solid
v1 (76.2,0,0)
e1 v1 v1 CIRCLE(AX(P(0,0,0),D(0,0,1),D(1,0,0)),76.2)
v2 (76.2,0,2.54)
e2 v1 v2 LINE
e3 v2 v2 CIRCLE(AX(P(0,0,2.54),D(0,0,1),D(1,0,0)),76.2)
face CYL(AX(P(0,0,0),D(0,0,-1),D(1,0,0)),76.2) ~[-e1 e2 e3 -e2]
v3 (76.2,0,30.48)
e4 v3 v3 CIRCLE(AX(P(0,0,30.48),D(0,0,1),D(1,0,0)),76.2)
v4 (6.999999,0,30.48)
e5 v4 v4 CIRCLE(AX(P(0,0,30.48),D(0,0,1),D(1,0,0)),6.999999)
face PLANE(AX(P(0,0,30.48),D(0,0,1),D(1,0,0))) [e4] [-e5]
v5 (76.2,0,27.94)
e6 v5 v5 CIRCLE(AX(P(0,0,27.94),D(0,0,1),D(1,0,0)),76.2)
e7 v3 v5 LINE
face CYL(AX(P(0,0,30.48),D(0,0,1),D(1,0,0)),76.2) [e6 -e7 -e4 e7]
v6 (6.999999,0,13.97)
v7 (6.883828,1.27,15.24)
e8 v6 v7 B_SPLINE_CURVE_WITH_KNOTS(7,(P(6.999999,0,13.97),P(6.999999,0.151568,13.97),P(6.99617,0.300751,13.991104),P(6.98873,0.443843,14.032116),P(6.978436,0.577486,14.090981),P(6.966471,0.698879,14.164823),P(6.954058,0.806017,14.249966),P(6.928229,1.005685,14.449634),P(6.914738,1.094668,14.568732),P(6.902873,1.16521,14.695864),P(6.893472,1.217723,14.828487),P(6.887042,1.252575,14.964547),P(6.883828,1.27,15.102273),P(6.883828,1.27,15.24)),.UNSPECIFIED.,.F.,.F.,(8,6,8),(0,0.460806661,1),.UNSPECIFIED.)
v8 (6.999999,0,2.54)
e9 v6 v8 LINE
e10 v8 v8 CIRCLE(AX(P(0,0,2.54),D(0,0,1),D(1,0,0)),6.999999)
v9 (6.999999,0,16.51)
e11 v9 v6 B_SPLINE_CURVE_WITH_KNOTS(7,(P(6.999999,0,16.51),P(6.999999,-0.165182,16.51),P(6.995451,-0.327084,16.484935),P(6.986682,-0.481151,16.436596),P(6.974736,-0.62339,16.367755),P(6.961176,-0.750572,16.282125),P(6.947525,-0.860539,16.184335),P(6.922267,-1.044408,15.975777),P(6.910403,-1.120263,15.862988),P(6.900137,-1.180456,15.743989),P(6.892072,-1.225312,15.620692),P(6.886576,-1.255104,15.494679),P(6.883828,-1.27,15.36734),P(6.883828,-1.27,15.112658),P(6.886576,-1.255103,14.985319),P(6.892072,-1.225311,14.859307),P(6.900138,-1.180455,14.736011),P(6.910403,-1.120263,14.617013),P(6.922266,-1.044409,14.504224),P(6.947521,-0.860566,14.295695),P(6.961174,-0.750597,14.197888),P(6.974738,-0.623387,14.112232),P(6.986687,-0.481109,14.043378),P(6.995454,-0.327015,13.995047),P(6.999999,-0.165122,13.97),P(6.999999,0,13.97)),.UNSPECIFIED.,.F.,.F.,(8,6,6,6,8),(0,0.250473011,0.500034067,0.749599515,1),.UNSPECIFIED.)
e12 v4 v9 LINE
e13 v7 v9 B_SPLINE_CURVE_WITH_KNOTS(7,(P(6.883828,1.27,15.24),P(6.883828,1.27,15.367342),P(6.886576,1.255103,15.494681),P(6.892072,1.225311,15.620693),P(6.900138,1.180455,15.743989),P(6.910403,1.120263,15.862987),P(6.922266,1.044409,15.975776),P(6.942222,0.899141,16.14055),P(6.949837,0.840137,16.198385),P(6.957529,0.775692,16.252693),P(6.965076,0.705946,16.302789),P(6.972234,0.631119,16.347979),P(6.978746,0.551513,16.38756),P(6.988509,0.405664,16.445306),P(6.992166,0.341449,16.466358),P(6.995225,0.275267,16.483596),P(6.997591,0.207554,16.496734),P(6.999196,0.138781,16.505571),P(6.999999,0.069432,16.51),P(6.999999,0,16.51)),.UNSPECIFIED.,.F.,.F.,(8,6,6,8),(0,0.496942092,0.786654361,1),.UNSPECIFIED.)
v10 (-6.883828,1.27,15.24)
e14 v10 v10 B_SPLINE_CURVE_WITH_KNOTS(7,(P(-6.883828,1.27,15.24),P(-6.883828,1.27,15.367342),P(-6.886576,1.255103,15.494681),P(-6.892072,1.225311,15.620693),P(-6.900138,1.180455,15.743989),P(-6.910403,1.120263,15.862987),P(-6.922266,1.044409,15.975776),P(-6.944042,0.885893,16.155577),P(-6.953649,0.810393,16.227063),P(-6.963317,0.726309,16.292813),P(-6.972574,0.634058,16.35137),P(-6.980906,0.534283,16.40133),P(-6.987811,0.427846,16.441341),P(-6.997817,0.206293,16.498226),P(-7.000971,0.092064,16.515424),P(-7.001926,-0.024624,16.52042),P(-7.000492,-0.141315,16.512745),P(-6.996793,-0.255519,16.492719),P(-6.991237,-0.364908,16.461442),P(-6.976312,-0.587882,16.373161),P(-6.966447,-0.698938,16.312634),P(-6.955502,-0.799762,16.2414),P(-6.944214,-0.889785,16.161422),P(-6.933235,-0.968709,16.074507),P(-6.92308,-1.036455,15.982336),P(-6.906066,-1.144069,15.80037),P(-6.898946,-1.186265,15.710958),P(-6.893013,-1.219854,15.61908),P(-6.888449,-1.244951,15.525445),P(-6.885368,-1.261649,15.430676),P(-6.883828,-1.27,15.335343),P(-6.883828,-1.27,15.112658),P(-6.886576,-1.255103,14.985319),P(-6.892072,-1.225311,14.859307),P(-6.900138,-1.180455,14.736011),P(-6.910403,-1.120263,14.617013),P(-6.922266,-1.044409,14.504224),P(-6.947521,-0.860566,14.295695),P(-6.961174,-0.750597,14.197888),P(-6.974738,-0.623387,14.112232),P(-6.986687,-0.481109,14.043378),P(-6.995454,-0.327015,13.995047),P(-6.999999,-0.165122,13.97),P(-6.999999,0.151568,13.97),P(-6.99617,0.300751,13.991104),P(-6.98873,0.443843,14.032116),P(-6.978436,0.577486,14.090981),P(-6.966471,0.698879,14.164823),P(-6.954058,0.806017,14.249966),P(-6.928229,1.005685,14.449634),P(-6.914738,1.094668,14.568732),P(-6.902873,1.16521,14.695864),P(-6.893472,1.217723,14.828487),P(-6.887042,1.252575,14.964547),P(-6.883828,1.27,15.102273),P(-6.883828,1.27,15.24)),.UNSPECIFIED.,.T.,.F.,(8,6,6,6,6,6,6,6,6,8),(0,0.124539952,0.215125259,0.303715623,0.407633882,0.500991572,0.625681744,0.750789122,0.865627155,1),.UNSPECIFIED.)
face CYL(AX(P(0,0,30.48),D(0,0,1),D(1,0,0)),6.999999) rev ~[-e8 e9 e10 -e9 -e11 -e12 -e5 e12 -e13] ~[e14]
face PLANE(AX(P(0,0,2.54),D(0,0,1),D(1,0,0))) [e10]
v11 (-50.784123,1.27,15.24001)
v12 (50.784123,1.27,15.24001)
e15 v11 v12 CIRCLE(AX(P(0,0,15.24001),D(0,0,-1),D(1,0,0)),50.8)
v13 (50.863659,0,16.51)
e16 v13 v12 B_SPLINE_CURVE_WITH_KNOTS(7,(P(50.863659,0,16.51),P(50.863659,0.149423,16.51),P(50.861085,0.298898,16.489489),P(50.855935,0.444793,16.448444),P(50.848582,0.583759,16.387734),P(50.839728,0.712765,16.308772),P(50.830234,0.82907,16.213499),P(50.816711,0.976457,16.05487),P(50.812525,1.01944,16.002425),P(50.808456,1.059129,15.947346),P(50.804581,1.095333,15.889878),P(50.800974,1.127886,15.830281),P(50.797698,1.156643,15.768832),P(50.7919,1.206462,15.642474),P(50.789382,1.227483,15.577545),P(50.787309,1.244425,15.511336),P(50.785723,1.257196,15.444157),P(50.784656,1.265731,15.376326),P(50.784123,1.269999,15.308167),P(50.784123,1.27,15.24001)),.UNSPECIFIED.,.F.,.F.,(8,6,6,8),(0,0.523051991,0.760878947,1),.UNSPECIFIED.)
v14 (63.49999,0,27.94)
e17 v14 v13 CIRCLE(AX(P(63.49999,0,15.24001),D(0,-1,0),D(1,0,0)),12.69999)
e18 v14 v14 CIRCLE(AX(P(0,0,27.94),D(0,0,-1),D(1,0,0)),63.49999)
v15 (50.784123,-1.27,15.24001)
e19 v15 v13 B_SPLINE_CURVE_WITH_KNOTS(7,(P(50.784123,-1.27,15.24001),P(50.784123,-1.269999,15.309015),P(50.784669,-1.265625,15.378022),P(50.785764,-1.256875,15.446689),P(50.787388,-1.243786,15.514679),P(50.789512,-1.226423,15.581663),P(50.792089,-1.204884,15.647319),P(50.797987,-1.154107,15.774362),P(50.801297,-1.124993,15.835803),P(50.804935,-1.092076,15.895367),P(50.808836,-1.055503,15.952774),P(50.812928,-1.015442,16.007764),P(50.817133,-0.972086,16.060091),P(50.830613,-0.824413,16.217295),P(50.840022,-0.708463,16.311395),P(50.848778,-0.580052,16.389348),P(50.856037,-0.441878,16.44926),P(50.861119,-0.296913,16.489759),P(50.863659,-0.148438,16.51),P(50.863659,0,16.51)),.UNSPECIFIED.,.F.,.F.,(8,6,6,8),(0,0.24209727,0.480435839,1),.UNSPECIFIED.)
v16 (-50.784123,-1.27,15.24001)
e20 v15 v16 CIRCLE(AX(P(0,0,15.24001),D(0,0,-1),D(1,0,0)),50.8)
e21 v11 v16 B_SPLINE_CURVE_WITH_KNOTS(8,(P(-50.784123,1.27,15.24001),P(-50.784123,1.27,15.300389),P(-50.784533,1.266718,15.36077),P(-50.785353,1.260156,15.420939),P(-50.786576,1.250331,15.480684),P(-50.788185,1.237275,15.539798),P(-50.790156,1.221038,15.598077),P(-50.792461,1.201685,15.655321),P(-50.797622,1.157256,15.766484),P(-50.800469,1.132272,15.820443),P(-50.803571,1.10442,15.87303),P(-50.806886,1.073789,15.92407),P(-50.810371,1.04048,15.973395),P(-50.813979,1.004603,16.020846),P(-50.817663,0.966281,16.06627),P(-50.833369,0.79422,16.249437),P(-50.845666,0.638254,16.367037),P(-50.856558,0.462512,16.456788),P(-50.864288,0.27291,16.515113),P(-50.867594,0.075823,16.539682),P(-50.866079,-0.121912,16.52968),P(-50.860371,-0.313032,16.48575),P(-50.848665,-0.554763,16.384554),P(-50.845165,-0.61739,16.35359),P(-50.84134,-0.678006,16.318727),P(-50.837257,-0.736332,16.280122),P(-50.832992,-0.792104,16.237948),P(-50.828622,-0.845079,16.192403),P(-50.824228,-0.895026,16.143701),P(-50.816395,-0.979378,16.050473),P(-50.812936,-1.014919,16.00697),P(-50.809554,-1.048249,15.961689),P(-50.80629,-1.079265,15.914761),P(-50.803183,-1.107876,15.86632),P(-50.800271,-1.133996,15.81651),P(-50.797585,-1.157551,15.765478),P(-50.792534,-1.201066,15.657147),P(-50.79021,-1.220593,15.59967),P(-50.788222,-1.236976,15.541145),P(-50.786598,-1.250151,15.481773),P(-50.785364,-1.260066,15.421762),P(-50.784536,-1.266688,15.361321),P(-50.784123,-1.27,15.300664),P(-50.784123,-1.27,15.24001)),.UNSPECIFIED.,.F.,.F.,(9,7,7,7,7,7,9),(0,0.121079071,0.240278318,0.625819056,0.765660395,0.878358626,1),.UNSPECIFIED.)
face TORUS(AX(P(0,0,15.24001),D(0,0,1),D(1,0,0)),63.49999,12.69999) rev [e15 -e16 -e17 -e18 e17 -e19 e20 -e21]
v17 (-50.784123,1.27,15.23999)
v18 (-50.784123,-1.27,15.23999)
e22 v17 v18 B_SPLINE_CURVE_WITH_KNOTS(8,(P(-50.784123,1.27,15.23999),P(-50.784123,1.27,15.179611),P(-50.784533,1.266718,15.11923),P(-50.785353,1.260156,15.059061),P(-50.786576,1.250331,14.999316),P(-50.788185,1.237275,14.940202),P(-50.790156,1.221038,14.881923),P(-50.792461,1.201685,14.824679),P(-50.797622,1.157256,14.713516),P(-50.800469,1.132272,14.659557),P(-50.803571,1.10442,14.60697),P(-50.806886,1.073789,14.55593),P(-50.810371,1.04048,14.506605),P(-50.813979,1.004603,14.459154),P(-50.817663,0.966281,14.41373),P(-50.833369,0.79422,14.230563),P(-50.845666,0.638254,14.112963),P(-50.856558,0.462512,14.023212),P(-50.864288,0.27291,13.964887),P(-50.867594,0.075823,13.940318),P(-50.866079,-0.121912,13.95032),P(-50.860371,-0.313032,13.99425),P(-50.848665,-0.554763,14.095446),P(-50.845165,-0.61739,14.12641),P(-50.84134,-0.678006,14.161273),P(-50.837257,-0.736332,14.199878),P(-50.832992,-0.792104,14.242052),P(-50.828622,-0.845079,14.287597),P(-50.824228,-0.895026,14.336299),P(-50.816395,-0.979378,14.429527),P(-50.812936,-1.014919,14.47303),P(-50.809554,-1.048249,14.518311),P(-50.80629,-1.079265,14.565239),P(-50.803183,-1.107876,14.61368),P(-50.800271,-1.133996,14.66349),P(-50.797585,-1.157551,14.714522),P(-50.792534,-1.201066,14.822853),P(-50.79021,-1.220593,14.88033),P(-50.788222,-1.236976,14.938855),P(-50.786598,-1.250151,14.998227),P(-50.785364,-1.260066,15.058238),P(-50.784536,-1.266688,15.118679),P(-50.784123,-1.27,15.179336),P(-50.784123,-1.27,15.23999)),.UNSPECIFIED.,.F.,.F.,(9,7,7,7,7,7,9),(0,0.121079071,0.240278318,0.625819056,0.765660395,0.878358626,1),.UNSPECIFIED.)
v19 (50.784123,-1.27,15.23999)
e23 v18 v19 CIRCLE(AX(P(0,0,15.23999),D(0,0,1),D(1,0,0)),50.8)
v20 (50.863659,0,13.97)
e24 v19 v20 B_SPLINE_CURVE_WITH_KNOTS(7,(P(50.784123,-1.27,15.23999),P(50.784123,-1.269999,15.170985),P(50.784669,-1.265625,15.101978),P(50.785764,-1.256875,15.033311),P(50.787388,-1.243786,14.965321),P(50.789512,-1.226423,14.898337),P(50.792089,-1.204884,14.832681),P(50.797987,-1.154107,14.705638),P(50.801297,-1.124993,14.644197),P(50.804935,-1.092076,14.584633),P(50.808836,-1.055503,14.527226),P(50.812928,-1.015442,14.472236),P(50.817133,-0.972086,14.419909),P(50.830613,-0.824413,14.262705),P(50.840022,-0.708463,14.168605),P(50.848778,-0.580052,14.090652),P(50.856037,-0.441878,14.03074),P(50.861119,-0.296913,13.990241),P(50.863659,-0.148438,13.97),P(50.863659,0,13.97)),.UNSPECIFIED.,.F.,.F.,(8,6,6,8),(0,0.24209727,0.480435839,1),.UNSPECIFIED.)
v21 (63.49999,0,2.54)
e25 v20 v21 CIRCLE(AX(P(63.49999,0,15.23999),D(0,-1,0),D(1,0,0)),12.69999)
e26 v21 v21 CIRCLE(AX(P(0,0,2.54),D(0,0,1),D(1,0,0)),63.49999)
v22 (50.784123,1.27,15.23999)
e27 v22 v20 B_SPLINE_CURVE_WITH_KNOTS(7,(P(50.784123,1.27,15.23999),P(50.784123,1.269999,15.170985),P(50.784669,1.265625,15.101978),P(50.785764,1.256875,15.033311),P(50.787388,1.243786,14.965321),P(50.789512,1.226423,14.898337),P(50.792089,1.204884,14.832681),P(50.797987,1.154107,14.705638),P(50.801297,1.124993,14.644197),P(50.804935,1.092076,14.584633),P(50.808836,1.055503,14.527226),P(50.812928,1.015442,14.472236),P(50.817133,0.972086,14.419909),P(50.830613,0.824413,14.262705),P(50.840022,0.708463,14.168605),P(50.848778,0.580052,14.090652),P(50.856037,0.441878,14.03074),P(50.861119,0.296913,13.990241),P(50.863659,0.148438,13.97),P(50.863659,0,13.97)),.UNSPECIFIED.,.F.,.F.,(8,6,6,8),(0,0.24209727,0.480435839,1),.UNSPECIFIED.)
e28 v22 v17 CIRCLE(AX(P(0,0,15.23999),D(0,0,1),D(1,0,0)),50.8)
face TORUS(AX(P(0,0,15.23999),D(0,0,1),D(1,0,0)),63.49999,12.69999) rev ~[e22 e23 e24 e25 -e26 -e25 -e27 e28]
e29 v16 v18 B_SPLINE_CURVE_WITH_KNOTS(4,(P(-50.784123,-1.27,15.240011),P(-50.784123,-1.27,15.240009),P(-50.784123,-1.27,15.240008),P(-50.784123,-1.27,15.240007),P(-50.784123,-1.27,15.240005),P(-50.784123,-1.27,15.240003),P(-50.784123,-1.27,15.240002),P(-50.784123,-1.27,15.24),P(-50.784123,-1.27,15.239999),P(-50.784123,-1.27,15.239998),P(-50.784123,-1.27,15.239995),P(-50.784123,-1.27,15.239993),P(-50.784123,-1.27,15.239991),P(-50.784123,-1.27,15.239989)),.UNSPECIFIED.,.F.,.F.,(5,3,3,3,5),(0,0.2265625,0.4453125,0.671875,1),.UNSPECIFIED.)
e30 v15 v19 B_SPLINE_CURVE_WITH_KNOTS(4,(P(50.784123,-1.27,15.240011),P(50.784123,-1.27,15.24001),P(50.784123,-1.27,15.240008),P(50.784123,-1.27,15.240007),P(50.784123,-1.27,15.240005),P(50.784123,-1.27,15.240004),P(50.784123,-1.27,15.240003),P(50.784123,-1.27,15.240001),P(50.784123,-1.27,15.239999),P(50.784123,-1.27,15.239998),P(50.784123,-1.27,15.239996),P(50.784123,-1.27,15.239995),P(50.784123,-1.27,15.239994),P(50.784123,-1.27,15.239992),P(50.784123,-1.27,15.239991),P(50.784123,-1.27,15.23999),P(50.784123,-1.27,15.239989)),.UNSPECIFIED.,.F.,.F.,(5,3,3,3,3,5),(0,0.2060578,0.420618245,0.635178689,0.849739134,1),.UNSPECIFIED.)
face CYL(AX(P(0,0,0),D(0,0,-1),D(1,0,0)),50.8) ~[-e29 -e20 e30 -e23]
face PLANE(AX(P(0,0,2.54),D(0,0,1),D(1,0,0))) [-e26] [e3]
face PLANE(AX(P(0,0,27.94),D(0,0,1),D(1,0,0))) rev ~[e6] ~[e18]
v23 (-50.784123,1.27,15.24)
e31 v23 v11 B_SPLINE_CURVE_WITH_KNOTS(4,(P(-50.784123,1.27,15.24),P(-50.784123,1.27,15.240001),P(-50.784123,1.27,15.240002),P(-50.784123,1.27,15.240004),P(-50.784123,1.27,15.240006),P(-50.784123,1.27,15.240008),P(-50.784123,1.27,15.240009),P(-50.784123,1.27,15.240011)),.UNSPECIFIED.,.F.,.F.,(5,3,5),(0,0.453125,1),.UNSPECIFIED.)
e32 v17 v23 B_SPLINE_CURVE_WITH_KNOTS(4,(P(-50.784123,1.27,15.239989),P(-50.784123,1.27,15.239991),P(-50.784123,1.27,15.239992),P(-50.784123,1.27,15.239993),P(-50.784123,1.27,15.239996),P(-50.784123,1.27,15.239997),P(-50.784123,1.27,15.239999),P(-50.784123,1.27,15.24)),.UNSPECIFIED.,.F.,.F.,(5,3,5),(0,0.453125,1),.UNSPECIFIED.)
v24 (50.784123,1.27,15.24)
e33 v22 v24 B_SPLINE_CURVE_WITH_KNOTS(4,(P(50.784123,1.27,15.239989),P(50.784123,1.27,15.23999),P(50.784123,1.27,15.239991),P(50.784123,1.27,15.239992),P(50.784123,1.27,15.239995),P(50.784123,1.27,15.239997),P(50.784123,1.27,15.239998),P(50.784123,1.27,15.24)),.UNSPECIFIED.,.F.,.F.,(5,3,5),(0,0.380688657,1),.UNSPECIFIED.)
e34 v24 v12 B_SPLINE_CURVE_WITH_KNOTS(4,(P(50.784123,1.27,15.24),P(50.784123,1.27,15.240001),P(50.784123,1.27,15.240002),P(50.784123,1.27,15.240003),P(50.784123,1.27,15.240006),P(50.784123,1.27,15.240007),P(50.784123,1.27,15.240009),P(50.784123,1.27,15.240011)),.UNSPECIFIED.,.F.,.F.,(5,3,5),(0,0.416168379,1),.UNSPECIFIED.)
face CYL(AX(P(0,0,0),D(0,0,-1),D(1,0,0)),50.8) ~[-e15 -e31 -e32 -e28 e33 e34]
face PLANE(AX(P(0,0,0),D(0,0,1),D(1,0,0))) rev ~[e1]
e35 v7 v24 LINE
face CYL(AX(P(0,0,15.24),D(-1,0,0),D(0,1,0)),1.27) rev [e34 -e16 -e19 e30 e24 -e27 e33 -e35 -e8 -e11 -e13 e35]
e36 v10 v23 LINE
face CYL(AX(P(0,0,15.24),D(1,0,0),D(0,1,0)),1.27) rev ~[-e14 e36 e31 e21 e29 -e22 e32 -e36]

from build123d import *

# Parameters (mm, degrees)
F0_R      = 50.8
F1_DEPTH  = 30.48
F0_R_2    = 76.2
F2_DEPTH  = 2.54
F3_R      = 76.2
F4_DEPTH  = 2.54
F5_R      = 12.69999
F6_R      = 1.27
F7_DEPTH  = 254
F8_DEPTH  = 254
F9_R      = 6.9999987
F10_DEPTH = 27.94


# Not quite as in the source:
# - a fillet or chamfer is up to 0.001 mm smaller than in the source, because OpenCascade refuses the exact size


with BuildPart() as f1:
    # F0 (on Top) → F1 (new body)
    with BuildSketch(Plane.XY):
        Circle(F0_R)
    extrude(amount=F1_DEPTH)

    # F0 (on Top) → F2 (join)
    with BuildSketch(Plane.XY):
        Circle(F0_R_2)
        Circle(F0_R, mode=Mode.SUBTRACT)
    extrude(amount=F2_DEPTH)

    # F3 (on face) → F4 (join)
    with BuildSketch(Plane.XY.offset(30.48)):
        Circle(F3_R)
    extrude(amount=-F4_DEPTH)

    # F5 (radius 12.7 in the source; OpenCascade refuses exactly that, so slightly less here)
    f5_edges = [f1.edges().sort_by_distance(p)[0] for p in [
        (50.8, 0, 15.24),
        (-50.8, 0, 27.94),
        (-50.8, 0, 2.54),
    ]]
    fillet(f5_edges, radius=F5_R)

    # F6 (on Right) → F7 (cut)
    with BuildSketch(Plane.YZ):
        with Locations((0, 15.24)):
            Circle(F6_R)
    extrude(amount=-F7_DEPTH, mode=Mode.SUBTRACT)

    # F6 (on Right) → F8 (cut)
    with BuildSketch(Plane.YZ):
        with Locations((0, 15.24)):
            Circle(F6_R)
    extrude(amount=F8_DEPTH, mode=Mode.SUBTRACT)

    # F9 (on face) → F10 (cut)
    with BuildSketch(Plane.XY.offset(30.48)):
        Circle(F9_R)
    extrude(amount=-F10_DEPTH, mode=Mode.SUBTRACT)


solid = f1.part
